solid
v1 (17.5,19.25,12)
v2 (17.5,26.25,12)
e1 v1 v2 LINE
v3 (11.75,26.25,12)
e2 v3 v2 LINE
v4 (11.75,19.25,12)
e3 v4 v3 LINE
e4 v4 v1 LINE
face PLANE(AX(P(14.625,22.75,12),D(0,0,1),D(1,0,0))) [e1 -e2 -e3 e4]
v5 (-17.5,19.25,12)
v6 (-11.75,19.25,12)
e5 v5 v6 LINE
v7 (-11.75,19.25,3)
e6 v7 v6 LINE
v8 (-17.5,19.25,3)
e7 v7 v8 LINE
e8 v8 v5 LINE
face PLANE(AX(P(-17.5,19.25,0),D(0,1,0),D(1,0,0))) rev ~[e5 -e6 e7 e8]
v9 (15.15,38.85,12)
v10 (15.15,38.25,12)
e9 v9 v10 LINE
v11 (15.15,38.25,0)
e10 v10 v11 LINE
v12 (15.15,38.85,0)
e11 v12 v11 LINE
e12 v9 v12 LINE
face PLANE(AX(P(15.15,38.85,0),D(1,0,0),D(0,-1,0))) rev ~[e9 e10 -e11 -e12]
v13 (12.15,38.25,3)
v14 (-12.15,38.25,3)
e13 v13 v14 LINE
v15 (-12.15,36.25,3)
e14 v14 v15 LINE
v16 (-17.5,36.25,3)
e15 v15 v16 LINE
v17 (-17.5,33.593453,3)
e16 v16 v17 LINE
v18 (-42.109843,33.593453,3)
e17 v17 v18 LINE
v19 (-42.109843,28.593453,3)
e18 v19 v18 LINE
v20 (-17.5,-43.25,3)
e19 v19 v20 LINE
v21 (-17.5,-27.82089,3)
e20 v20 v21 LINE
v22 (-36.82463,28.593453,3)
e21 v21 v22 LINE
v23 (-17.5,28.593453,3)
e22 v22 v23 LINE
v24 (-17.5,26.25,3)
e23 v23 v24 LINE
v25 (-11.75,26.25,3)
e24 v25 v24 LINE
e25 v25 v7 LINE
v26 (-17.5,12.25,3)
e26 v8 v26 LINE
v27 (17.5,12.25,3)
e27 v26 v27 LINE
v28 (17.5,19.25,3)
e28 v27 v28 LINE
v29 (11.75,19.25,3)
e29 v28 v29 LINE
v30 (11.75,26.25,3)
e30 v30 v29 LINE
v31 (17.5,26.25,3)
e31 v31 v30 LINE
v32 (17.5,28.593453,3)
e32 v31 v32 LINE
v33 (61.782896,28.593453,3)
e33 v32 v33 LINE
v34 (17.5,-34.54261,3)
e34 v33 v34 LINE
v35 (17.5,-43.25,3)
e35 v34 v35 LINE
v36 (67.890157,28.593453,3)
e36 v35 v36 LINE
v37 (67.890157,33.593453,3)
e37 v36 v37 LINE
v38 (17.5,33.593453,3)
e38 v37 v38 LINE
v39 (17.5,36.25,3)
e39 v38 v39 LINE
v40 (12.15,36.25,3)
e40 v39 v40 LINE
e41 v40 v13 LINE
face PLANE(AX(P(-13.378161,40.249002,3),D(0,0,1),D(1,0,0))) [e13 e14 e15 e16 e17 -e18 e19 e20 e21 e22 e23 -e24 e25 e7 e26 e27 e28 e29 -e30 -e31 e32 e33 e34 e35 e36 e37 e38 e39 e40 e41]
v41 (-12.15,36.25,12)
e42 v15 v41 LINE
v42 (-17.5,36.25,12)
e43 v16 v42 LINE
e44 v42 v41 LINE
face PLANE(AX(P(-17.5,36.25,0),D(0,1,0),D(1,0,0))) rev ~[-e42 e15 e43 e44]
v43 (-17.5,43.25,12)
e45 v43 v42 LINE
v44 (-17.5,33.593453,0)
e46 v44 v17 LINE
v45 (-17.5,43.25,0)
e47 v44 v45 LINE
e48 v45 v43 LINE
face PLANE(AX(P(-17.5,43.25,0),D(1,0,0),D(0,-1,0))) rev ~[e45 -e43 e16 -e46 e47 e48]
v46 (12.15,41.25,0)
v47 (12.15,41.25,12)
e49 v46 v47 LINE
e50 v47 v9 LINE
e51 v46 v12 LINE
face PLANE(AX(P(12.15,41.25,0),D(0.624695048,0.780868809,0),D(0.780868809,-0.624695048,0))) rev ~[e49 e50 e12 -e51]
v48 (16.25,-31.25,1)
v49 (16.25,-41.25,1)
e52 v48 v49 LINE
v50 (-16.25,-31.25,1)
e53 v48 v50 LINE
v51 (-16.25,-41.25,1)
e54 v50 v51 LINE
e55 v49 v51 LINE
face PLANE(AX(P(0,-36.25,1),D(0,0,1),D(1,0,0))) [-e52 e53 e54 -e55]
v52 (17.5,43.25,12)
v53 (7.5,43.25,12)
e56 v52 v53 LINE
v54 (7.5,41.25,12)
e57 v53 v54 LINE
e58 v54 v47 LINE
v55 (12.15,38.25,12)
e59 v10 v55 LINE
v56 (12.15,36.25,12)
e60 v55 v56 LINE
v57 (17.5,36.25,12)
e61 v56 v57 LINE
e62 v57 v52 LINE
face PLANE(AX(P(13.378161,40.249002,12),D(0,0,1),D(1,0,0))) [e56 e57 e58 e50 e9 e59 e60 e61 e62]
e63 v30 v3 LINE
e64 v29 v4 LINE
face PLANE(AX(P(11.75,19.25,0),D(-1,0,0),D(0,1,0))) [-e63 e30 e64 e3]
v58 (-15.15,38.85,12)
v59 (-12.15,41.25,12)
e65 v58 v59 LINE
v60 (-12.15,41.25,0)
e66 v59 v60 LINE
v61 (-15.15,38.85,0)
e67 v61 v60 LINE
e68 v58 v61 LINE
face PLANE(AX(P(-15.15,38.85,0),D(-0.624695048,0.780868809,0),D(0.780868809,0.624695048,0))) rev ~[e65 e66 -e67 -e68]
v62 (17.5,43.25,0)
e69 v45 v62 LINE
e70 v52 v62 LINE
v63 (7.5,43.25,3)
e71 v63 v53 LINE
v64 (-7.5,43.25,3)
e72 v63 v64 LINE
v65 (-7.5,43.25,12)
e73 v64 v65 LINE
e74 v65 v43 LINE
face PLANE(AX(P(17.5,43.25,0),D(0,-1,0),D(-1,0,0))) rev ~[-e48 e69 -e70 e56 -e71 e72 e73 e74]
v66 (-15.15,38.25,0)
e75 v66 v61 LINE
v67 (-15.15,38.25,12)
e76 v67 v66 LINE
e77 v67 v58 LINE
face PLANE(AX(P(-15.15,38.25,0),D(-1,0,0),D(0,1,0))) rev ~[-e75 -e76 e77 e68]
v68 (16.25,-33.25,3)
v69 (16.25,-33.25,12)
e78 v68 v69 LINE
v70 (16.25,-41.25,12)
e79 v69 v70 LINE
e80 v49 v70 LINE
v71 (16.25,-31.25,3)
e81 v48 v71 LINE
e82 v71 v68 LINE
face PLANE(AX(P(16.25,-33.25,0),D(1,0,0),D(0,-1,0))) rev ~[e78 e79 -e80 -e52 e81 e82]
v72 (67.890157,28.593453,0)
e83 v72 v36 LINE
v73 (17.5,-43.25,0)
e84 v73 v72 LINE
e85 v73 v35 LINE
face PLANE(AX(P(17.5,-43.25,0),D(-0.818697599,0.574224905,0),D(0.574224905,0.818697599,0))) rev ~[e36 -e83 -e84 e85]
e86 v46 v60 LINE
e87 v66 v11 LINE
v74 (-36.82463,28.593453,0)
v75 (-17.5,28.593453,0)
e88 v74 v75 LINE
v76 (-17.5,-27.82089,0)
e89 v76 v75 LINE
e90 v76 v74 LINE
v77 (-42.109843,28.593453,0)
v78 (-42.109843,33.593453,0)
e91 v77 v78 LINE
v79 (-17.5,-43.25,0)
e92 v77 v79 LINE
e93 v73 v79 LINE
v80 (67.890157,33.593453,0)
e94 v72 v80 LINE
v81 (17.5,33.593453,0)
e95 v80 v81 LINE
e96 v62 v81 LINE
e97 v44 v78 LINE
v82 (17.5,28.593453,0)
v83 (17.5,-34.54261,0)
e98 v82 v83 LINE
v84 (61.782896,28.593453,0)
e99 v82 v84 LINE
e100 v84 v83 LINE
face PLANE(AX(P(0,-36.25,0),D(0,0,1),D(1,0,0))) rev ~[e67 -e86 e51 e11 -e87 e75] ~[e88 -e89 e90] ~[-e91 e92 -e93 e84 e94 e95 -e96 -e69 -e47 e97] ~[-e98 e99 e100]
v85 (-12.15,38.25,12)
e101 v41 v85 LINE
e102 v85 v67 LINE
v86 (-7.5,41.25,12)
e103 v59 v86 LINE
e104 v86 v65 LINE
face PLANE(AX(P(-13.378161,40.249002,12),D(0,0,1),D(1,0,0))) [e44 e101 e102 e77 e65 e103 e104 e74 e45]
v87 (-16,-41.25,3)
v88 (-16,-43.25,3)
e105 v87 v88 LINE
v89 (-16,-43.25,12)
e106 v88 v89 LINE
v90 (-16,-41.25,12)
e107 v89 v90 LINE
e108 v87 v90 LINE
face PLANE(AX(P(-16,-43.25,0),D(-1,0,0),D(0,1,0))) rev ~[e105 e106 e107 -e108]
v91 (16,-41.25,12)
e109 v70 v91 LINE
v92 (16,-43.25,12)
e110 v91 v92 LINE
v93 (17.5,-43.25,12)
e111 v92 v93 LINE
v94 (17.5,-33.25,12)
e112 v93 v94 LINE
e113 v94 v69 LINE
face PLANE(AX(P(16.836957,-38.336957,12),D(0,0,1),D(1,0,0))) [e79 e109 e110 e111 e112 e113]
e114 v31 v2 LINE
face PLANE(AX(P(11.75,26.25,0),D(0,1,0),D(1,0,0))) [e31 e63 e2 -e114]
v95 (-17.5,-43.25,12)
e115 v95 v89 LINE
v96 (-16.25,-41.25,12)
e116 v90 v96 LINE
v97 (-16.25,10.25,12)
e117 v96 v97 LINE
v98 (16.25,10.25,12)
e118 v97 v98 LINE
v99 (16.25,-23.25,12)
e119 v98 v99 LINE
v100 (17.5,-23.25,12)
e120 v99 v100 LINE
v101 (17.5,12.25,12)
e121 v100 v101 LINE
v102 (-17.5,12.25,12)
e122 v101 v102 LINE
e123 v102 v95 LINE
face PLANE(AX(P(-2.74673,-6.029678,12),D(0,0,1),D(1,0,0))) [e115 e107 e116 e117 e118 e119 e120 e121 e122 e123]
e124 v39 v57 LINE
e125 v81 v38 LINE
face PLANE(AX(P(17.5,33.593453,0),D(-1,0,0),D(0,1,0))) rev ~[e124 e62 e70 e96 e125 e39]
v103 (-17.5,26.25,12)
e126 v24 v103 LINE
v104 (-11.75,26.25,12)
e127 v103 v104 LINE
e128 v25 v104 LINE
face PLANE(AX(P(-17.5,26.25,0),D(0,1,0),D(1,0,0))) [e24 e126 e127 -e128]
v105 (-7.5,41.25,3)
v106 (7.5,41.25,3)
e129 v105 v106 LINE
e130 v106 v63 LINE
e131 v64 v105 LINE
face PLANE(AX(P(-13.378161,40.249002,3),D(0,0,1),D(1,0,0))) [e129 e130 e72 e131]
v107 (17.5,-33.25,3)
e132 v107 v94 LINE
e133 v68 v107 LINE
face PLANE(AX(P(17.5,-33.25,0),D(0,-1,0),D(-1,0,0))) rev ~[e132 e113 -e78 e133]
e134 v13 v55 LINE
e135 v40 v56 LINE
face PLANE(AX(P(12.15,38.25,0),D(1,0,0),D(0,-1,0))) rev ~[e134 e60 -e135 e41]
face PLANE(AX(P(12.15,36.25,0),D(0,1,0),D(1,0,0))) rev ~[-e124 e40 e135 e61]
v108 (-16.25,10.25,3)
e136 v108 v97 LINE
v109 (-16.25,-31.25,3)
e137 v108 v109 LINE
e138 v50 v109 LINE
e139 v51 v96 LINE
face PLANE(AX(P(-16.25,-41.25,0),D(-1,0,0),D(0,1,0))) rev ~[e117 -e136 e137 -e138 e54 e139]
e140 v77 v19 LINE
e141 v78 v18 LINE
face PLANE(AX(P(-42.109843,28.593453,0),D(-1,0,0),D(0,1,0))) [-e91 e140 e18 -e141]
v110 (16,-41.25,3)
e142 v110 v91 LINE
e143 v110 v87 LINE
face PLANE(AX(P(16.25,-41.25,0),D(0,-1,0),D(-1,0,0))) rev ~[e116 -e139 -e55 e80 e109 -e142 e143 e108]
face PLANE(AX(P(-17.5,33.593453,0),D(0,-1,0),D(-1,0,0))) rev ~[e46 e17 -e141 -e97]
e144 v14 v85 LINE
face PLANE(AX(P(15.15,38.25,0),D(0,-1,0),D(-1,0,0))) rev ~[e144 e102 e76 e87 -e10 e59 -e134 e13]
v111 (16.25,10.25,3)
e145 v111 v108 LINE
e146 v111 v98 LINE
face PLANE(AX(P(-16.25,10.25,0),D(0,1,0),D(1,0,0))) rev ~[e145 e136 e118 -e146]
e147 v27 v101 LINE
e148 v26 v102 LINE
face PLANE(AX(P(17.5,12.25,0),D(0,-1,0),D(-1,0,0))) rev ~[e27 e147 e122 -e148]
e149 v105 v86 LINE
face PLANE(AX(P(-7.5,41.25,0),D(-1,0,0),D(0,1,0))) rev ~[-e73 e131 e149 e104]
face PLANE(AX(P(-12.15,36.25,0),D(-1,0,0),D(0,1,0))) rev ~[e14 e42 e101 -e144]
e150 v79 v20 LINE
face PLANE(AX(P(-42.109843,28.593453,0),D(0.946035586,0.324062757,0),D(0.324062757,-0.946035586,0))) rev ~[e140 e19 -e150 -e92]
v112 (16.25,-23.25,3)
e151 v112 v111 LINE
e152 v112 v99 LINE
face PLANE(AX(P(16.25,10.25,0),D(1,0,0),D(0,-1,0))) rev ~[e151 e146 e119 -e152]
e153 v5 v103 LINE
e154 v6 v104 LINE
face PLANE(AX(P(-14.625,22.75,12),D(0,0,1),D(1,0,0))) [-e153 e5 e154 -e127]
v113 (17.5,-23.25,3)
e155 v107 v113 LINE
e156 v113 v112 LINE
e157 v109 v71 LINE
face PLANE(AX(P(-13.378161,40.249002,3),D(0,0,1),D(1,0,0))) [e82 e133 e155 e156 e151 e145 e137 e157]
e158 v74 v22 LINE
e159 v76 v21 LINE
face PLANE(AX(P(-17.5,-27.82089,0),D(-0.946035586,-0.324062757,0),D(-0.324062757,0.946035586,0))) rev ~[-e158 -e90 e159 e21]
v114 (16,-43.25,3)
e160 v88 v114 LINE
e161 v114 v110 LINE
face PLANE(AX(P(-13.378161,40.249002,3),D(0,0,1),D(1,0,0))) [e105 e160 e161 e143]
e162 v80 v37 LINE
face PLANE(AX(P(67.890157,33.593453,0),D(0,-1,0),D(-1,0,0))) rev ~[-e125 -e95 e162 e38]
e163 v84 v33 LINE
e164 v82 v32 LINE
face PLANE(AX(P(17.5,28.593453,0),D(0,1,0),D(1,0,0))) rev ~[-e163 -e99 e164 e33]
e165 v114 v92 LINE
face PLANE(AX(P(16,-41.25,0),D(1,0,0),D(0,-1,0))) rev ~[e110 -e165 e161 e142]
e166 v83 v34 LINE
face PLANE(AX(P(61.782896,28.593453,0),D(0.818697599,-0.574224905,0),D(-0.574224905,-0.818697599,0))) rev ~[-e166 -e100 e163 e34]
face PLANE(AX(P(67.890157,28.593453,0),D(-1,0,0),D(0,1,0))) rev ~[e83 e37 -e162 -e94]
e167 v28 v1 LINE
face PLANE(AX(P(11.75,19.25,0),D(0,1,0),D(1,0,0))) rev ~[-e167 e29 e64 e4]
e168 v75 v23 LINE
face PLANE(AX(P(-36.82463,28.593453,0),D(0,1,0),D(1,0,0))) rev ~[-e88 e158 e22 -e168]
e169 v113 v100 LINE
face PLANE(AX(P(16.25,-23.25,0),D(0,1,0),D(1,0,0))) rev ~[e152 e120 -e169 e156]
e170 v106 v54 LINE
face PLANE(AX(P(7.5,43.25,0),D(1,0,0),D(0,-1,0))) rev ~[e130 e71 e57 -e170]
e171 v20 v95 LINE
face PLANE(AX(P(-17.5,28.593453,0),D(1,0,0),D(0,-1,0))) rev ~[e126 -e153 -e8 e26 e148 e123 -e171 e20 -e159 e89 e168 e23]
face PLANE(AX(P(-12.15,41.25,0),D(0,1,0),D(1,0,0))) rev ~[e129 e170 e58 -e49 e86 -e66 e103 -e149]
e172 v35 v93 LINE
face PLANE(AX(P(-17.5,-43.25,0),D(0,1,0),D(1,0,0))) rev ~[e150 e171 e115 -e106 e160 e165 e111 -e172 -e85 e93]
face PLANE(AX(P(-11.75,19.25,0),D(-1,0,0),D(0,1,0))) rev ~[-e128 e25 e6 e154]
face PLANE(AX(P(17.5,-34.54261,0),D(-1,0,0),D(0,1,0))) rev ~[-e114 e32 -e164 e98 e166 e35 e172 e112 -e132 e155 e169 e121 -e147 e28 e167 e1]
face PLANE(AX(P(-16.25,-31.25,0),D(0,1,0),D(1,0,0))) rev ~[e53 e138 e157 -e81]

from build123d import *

# Parameters (mm, degrees)
F0_W     = 5
F0_H     = 5
F0_W_2   = 5.75
F0_H_2   = 7
F1_DEPTH = 3
F2_DEPTH = 1
F3_DEPTH = 12


# Not quite as in the source:
# - a feature names something its author has since deleted; it is built from what else it names


with BuildPart() as f1:
    # F0 (on Top) → F1 (new body)
    with BuildSketch(Plane.XY):
        Polygon((-7.5, 41.25), (-7.5, 43.25), (-17.5, 43.25), (-17.5, 36.25), (-12.15, 36.25), (-12.15, 38.25), (-15.15, 38.25), (-15.15, 38.85), (-12.15, 41.25), align=None)
        Polygon((7.5, 43.25), (0, 43.25), (-7.5, 43.25), (-7.5, 41.25), (0, 41.25), (7.5, 41.25), align=None)
        Polygon((17.5, 43.25), (7.5, 43.25), (7.5, 41.25), (12.15, 41.25), (15.15, 38.85), (15.15, 38.25), (12.15, 38.25), (12.15, 36.25), (17.5, 36.25), align=None)
        Polygon((-17.5, 0), (-17.5, -27.8208897438), (-17.5, -43.25), (-16, -43.25), (-16, -41.25), (-16.25, -41.25), (-16.25, -31.25), (-16.25, 10.25), (0, 10.25), (16.25, 10.25), (16.25, -23.25), (17.5, -23.25), (17.5, 0), (17.5, 12.25), (-17.5, 12.25), align=None)
        Polygon((16.25, -33.25), (17.5, -33.25), (17.5, -23.25), (16.25, -23.25), (16.25, -31.25), align=None)
        Polygon((62.8901566565, 28.5934534669), (61.7828955537, 28.5934534669), (17.5, -34.5426103437), (17.5, -43.25), (67.8901566565, 28.5934534669), align=None)
        Polygon((-17.5, 28.5934534669), (-17.5, 33.5934534669), (-37.1098433435, 33.5934534669), (-37.1098433435, 28.5934534669), (-36.8246298966, 28.5934534669), align=None)
        with Locations((-39.6098433435, 31.0934534669)):
            Rectangle(F0_W, F0_H)
        with Locations((65.3901566565, 31.0934534669)):
            Rectangle(F0_W, F0_H)
        Polygon((62.8901566565, 33.5934534669), (17.5, 33.5934534669), (17.5, 28.5934534669), (61.7828955537, 28.5934534669), (62.8901566565, 28.5934534669), align=None)
        Polygon((16.25, -31.25), (16.25, -23.25), (16.25, 10.25), (0, 10.25), (-16.25, 10.25), (-16.25, -31.25), align=None)
        Polygon((-17.5, -27.8208897438), (-36.8246298966, 28.5934534669), (-37.1098433435, 28.5934534669), (-42.1098433435, 28.5934534669), (-17.5, -43.25), align=None)
        Polygon((-16, -41.25), (-16, -43.25), (0, -43.25), (16, -43.25), (16, -41.25), (0, -41.25), align=None)
        Polygon((17.5, -43.25), (17.5, -34.5426103437), (17.5, -33.25), (16.25, -33.25), (16.25, -41.25), (16, -41.25), (16, -43.25), align=None)
        Polygon((-12.15, 36.25), (-17.5, 36.25), (-17.5, 33.5934534669), (-17.5, 28.5934534669), (-17.5, 26.25), (-11.75, 26.25), (-11.75, 19.25), (-17.5, 19.25), (-17.5, 12.25), (17.5, 12.25), (17.5, 19.25), (11.75, 19.25), (11.75, 26.25), (17.5, 26.25), (17.5, 28.5934534669), (17.5, 33.5934534669), (17.5, 36.25), (12.15, 36.25), (12.15, 38.25), (0, 38.25), (-12.15, 38.25), align=None)
        with Locations((-14.625, 22.75)):
            Rectangle(F0_W_2, F0_H_2)
        with Locations((14.625, 22.75)):
            Rectangle(F0_W_2, F0_H_2)
    extrude(amount=F1_DEPTH)

    # F0 (on Top) → F2 (join)
    with BuildSketch(Plane.XY):
        Polygon((16.25, -41.25), (16.25, -33.25), (16.25, -31.25), (-16.25, -31.25), (-16.25, -41.25), (-16, -41.25), (0, -41.25), (16, -41.25), align=None)
    extrude(amount=F2_DEPTH)

    # F0 (on Top) → F3 (join)
    with BuildSketch(Plane.XY):
        Polygon((-7.5, 41.25), (-7.5, 43.25), (-17.5, 43.25), (-17.5, 36.25), (-12.15, 36.25), (-12.15, 38.25), (-15.15, 38.25), (-15.15, 38.85), (-12.15, 41.25), align=None)
        Polygon((17.5, 43.25), (7.5, 43.25), (7.5, 41.25), (12.15, 41.25), (15.15, 38.85), (15.15, 38.25), (12.15, 38.25), (12.15, 36.25), (17.5, 36.25), align=None)
        Polygon((-17.5, 0), (-17.5, -27.8208897438), (-17.5, -43.25), (-16, -43.25), (-16, -41.25), (-16.25, -41.25), (-16.25, -31.25), (-16.25, 10.25), (0, 10.25), (16.25, 10.25), (16.25, -23.25), (17.5, -23.25), (17.5, 0), (17.5, 12.25), (-17.5, 12.25), align=None)
        Polygon((17.5, -43.25), (17.5, -34.5426103437), (17.5, -33.25), (16.25, -33.25), (16.25, -41.25), (16, -41.25), (16, -43.25), align=None)
        with Locations((-14.625, 22.75)):
            Rectangle(F0_W_2, F0_H_2)
        with Locations((14.625, 22.75)):
            Rectangle(F0_W_2, F0_H_2)
    extrude(amount=F3_DEPTH)


solid = f1.part
